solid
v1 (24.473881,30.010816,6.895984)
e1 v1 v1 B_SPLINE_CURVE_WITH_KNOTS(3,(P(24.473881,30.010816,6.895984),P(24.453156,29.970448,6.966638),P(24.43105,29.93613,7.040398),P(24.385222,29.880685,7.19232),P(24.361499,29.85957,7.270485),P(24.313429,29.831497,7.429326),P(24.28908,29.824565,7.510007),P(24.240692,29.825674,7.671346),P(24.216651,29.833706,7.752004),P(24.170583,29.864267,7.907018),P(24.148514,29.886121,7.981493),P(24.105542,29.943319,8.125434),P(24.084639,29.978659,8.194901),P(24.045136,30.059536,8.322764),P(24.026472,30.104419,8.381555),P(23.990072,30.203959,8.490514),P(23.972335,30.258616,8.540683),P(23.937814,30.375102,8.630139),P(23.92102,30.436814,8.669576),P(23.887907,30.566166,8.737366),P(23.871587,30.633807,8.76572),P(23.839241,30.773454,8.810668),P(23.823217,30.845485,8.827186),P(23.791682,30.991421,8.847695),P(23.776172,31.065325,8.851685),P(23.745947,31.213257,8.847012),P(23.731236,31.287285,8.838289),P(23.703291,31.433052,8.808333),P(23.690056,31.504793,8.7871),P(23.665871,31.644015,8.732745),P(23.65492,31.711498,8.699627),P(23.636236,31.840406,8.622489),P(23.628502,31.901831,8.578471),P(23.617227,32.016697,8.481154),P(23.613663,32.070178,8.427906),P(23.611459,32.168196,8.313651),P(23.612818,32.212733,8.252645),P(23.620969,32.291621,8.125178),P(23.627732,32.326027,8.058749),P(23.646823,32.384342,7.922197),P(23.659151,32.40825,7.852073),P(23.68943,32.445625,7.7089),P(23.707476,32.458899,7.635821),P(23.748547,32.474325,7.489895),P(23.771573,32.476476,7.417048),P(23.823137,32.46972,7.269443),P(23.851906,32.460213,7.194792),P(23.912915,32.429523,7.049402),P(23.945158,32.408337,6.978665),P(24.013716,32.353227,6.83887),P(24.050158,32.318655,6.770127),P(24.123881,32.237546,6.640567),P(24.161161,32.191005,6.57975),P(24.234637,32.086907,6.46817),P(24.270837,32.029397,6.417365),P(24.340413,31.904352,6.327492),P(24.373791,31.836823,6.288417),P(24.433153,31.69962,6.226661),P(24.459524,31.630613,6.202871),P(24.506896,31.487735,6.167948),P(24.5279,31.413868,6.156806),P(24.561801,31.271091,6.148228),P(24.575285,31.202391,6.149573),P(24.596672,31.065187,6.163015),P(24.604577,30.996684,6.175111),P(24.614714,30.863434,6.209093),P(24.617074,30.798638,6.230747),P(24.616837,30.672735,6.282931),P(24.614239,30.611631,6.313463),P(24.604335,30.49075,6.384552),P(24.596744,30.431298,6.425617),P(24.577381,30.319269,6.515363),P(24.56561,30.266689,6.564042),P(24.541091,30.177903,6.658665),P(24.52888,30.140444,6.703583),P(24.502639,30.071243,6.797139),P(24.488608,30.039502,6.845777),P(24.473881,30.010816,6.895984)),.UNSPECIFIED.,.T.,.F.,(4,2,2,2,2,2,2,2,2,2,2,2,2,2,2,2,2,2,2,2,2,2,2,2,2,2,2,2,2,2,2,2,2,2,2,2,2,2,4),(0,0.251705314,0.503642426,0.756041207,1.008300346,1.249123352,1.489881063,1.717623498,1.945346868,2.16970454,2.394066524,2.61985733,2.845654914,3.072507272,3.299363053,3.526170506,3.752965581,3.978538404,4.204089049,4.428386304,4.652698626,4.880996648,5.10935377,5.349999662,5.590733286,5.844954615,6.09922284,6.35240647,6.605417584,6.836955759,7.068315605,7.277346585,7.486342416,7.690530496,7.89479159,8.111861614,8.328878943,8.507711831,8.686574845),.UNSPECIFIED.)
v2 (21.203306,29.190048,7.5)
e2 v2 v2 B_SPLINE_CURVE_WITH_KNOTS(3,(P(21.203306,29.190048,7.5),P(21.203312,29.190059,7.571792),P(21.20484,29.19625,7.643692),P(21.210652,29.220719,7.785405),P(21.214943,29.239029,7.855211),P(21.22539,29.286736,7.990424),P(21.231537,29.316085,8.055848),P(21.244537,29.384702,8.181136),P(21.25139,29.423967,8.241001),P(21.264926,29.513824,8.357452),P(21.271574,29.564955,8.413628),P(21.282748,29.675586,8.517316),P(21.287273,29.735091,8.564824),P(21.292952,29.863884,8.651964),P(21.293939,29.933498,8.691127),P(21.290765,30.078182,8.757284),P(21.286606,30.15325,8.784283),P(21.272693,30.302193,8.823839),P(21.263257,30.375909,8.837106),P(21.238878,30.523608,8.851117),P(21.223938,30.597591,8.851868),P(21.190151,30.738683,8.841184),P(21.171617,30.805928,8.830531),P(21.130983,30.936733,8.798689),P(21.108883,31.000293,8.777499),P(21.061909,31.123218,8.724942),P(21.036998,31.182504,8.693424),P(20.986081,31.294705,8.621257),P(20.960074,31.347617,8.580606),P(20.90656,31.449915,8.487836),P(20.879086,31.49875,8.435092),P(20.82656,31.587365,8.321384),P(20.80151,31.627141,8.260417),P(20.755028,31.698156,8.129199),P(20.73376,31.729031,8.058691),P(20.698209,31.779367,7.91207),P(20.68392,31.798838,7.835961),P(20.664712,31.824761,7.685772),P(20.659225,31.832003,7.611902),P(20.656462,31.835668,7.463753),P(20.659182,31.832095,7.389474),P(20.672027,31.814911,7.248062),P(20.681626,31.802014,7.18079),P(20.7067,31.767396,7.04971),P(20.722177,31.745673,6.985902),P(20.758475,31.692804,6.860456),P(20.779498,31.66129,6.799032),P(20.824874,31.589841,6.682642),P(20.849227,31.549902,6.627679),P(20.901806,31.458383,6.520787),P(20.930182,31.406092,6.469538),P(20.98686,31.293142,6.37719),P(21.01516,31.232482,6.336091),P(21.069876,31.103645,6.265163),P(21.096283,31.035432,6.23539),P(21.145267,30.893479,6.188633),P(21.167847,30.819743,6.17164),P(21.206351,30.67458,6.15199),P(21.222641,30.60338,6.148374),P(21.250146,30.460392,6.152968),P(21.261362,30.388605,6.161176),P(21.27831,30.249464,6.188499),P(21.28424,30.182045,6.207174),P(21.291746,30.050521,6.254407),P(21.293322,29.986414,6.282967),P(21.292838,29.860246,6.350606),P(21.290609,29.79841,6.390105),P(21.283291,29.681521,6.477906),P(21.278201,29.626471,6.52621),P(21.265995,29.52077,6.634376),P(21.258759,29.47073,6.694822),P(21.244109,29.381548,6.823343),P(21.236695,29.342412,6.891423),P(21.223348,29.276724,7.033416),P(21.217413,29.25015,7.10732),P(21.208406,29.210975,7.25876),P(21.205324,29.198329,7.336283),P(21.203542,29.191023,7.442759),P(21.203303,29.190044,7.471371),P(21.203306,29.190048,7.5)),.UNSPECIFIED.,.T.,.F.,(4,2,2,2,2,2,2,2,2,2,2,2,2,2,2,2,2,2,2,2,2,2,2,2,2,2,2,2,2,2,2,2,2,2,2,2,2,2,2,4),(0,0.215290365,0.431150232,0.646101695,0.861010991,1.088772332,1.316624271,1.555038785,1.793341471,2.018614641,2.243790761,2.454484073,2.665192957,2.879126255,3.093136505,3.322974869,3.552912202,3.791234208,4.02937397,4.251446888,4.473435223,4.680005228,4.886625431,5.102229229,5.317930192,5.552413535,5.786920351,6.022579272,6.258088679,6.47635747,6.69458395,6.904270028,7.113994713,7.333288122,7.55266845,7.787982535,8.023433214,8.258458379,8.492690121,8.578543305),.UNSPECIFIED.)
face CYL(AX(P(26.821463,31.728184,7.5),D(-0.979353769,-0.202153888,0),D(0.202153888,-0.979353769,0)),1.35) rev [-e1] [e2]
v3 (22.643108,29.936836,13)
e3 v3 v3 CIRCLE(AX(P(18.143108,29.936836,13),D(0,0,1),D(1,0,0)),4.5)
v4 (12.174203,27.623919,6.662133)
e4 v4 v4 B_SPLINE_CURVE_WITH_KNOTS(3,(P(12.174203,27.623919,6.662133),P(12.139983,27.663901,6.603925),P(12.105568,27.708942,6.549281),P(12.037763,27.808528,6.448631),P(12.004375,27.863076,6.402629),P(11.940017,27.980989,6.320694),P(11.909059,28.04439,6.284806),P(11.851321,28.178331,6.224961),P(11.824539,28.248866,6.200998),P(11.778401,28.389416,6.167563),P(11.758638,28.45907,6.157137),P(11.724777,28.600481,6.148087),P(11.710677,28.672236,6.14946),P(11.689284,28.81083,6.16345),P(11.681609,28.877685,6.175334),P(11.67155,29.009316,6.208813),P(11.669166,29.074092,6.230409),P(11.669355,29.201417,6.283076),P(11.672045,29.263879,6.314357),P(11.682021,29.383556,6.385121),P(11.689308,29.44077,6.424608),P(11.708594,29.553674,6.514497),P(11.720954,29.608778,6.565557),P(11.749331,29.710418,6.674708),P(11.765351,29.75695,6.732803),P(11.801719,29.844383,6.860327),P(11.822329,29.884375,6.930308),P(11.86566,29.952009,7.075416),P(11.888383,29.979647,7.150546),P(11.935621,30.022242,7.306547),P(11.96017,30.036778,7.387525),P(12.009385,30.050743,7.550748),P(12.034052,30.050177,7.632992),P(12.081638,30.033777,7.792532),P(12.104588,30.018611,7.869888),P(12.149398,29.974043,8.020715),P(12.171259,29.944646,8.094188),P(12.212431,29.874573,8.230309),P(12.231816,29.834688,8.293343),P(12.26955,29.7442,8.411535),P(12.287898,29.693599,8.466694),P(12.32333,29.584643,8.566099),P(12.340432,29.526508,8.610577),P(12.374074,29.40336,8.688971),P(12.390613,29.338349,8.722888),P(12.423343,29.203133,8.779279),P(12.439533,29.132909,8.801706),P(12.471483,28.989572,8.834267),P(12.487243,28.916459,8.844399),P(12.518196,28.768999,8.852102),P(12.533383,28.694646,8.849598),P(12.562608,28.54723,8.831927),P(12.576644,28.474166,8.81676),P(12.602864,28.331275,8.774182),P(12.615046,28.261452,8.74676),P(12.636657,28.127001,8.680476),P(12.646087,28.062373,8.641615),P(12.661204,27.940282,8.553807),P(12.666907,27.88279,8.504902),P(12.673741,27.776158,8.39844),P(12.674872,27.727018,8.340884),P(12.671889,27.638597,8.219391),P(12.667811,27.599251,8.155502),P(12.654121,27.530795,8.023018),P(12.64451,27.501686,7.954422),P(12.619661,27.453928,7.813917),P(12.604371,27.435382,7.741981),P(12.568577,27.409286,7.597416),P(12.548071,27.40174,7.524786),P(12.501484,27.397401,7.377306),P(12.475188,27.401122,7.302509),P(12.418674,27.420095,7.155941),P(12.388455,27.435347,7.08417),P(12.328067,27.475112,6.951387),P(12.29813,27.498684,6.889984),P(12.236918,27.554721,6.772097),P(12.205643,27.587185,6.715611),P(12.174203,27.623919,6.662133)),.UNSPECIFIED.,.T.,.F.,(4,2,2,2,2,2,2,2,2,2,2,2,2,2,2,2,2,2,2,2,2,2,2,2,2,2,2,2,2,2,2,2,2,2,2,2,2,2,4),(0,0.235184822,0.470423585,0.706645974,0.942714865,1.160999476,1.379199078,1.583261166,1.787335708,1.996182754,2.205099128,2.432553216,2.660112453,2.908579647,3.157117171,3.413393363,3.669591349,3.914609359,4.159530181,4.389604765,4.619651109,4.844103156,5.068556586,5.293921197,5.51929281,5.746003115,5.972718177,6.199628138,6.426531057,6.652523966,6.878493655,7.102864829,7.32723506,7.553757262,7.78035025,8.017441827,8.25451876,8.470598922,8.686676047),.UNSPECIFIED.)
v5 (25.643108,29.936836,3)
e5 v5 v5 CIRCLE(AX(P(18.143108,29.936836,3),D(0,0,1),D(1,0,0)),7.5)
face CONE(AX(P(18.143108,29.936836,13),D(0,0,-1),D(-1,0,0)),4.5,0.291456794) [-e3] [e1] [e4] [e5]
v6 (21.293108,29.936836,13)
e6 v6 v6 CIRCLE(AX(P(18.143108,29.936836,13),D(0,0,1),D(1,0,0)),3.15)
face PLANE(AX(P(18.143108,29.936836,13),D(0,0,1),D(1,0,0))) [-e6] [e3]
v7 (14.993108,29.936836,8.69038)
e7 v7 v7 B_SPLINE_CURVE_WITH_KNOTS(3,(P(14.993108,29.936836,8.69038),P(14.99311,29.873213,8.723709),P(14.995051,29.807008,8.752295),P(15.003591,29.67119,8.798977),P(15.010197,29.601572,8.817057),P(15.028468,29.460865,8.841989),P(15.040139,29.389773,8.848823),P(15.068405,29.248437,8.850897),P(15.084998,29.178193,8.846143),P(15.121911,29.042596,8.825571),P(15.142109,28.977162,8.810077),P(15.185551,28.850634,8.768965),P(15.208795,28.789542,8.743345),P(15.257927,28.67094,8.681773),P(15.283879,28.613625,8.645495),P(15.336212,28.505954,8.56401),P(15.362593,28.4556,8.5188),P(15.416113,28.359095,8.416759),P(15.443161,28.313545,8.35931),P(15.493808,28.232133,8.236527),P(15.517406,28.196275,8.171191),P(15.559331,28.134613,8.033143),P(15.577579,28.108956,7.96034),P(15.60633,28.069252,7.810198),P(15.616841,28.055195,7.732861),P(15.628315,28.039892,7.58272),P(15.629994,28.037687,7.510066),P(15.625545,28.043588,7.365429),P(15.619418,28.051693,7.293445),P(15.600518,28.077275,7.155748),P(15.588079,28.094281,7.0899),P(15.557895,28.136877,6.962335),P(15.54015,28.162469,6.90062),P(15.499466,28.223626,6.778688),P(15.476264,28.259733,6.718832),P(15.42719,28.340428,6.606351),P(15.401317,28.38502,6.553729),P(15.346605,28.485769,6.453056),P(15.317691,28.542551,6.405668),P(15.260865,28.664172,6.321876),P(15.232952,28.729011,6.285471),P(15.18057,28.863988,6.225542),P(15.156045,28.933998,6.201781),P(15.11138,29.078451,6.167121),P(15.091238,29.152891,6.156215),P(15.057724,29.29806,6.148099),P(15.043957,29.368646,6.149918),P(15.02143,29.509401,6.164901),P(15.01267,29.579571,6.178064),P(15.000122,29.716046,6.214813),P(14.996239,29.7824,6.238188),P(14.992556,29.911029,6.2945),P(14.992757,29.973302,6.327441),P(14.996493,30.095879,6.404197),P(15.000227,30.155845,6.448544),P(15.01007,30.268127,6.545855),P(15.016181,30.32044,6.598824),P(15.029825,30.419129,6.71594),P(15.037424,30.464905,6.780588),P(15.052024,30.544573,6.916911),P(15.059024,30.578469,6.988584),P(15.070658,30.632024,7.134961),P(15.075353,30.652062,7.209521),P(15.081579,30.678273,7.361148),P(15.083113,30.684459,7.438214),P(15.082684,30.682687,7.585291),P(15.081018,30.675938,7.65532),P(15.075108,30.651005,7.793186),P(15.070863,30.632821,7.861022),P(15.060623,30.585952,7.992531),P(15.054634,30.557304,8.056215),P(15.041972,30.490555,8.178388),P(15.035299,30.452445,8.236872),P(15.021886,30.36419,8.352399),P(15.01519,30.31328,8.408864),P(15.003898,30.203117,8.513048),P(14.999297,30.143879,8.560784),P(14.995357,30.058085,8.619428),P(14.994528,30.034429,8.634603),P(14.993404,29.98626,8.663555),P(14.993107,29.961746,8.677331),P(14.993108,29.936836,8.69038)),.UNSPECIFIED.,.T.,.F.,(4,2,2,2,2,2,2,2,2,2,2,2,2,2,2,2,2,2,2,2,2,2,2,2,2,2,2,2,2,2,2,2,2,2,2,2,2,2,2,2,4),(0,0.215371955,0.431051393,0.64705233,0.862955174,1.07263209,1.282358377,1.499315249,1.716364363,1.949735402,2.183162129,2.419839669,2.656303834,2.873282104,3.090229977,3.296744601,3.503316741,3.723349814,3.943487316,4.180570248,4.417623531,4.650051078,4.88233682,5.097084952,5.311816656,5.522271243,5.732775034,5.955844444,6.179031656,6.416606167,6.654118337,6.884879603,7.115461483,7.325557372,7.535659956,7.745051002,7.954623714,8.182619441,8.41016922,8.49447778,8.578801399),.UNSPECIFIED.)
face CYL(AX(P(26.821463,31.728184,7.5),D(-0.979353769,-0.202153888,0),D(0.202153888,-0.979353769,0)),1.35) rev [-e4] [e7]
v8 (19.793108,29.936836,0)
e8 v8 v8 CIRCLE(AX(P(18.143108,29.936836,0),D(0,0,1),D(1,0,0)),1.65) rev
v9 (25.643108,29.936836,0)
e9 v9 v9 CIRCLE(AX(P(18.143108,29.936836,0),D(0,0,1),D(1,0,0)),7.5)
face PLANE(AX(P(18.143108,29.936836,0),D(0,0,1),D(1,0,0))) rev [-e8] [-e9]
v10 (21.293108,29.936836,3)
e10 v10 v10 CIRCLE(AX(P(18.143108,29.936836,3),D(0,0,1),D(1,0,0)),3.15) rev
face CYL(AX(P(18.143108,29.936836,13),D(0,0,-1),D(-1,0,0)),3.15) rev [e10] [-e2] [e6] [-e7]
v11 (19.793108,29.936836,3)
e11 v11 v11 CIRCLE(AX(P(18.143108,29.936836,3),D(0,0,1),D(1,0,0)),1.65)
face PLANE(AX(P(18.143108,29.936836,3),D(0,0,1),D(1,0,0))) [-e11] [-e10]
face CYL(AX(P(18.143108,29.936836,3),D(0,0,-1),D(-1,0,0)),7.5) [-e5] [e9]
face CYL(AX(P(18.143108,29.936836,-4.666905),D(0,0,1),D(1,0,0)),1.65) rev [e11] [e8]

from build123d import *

# Parameters (mm, degrees)
SKETCH_6_R               = 7.5
EXTRUDE_1_DEPTH          = 3
SKETCH_7_R               = 4.5
SKETCH_7_R_2             = 3.15
EXTRUDE_2_DEPTH          = 10
SKETCH_9_R               = 1.65
CUT_EXTRUDE_1_DEPTH      = 3
CHAMFER_1_SIZE           = 3
CHAMFER_1_SIZE_2         = 10
CUT_EXTRUDE_2_DEPTH      = 37.903513147
CUT_EXTRUDE_2_DEPTH_BACK = 37.903513147
SKETCH_10_R              = 1.35


with BuildPart() as part:
    # 草图6 → 凸台-拉伸1 (new body)
    with BuildSketch(Plane.XY):
        with Locations((18.143108258, 29.936835998)):
            Circle(SKETCH_6_R)
    extrude(amount=EXTRUDE_1_DEPTH)

    # 草图7 → 凸台-拉伸2 (add)
    with BuildSketch(Plane.XY.offset(3)):
        with Locations((18.143108258, 29.936835998)):
            Circle(SKETCH_7_R)
        with Locations((18.143108258, 29.936835998)):
            Circle(SKETCH_7_R_2, mode=Mode.SUBTRACT)
    extrude(amount=EXTRUDE_2_DEPTH)

    # 草图9 → 切除-拉伸1 (cut)
    with BuildSketch(Plane.XY.offset(3)):
        with Locations((18.143108258, 29.936835998)):
            Circle(SKETCH_9_R)
    extrude(amount=-CUT_EXTRUDE_1_DEPTH, mode=Mode.SUBTRACT)

    # 倒角1
    # the kernel refuses this chamfer: 10, 3 mm, written as the material it adds along each edge
    with BuildSketch(Plane(origin=(18.143108258, 29.936835998, 3), x_dir=(1, 0, 0), z_dir=(0, -1, 0))) as chamfer_1_piece_1_section:
        Polygon((4.5 + CHAMFER_1_SIZE, 0), (4.5, CHAMFER_1_SIZE_2), (4.5, 0), align=None)
    chamfer_1_piece_1 = revolve(axis=Axis((18.143108258, 29.936835998, 3), (0, 0, 1)), mode=Mode.PRIVATE)
    chamfer_1_piece_1 = chamfer_1_piece_1 & Plane(origin=(18.143108258, 29.936835998, 7.975650117), x_dir=(1, 0, 0), z_dir=(0, 0, -1)) * Cylinder(7.5, 40, mode=Mode.PRIVATE)
    chamfer_1_piece_1 = split(chamfer_1_piece_1, bisect_by=Plane(origin=(12.224274533, 29.936835998, 13), z_dir=(0, 0, -1)), keep=Keep.TOP, mode=Mode.PRIVATE)
    add(chamfer_1_piece_1)

    # 草图10 → 切除-拉伸2 (cut, two sides: drawn at the far end of the back side and taken through both)
    with BuildSketch(Plane(origin=(18.921476442, 3.905687751, 0), x_dir=(0, 0, 1), z_dir=(-0.9793537694565077, -0.20215388754938593, 0)).offset(-CUT_EXTRUDE_2_DEPTH_BACK)):
        with Locations(Location((7.5, 25.651053313, 0), (0, 0, 270))):
            Circle(SKETCH_10_R)
    extrude(amount=CUT_EXTRUDE_2_DEPTH + CUT_EXTRUDE_2_DEPTH_BACK, mode=Mode.SUBTRACT)


solid = part.part
